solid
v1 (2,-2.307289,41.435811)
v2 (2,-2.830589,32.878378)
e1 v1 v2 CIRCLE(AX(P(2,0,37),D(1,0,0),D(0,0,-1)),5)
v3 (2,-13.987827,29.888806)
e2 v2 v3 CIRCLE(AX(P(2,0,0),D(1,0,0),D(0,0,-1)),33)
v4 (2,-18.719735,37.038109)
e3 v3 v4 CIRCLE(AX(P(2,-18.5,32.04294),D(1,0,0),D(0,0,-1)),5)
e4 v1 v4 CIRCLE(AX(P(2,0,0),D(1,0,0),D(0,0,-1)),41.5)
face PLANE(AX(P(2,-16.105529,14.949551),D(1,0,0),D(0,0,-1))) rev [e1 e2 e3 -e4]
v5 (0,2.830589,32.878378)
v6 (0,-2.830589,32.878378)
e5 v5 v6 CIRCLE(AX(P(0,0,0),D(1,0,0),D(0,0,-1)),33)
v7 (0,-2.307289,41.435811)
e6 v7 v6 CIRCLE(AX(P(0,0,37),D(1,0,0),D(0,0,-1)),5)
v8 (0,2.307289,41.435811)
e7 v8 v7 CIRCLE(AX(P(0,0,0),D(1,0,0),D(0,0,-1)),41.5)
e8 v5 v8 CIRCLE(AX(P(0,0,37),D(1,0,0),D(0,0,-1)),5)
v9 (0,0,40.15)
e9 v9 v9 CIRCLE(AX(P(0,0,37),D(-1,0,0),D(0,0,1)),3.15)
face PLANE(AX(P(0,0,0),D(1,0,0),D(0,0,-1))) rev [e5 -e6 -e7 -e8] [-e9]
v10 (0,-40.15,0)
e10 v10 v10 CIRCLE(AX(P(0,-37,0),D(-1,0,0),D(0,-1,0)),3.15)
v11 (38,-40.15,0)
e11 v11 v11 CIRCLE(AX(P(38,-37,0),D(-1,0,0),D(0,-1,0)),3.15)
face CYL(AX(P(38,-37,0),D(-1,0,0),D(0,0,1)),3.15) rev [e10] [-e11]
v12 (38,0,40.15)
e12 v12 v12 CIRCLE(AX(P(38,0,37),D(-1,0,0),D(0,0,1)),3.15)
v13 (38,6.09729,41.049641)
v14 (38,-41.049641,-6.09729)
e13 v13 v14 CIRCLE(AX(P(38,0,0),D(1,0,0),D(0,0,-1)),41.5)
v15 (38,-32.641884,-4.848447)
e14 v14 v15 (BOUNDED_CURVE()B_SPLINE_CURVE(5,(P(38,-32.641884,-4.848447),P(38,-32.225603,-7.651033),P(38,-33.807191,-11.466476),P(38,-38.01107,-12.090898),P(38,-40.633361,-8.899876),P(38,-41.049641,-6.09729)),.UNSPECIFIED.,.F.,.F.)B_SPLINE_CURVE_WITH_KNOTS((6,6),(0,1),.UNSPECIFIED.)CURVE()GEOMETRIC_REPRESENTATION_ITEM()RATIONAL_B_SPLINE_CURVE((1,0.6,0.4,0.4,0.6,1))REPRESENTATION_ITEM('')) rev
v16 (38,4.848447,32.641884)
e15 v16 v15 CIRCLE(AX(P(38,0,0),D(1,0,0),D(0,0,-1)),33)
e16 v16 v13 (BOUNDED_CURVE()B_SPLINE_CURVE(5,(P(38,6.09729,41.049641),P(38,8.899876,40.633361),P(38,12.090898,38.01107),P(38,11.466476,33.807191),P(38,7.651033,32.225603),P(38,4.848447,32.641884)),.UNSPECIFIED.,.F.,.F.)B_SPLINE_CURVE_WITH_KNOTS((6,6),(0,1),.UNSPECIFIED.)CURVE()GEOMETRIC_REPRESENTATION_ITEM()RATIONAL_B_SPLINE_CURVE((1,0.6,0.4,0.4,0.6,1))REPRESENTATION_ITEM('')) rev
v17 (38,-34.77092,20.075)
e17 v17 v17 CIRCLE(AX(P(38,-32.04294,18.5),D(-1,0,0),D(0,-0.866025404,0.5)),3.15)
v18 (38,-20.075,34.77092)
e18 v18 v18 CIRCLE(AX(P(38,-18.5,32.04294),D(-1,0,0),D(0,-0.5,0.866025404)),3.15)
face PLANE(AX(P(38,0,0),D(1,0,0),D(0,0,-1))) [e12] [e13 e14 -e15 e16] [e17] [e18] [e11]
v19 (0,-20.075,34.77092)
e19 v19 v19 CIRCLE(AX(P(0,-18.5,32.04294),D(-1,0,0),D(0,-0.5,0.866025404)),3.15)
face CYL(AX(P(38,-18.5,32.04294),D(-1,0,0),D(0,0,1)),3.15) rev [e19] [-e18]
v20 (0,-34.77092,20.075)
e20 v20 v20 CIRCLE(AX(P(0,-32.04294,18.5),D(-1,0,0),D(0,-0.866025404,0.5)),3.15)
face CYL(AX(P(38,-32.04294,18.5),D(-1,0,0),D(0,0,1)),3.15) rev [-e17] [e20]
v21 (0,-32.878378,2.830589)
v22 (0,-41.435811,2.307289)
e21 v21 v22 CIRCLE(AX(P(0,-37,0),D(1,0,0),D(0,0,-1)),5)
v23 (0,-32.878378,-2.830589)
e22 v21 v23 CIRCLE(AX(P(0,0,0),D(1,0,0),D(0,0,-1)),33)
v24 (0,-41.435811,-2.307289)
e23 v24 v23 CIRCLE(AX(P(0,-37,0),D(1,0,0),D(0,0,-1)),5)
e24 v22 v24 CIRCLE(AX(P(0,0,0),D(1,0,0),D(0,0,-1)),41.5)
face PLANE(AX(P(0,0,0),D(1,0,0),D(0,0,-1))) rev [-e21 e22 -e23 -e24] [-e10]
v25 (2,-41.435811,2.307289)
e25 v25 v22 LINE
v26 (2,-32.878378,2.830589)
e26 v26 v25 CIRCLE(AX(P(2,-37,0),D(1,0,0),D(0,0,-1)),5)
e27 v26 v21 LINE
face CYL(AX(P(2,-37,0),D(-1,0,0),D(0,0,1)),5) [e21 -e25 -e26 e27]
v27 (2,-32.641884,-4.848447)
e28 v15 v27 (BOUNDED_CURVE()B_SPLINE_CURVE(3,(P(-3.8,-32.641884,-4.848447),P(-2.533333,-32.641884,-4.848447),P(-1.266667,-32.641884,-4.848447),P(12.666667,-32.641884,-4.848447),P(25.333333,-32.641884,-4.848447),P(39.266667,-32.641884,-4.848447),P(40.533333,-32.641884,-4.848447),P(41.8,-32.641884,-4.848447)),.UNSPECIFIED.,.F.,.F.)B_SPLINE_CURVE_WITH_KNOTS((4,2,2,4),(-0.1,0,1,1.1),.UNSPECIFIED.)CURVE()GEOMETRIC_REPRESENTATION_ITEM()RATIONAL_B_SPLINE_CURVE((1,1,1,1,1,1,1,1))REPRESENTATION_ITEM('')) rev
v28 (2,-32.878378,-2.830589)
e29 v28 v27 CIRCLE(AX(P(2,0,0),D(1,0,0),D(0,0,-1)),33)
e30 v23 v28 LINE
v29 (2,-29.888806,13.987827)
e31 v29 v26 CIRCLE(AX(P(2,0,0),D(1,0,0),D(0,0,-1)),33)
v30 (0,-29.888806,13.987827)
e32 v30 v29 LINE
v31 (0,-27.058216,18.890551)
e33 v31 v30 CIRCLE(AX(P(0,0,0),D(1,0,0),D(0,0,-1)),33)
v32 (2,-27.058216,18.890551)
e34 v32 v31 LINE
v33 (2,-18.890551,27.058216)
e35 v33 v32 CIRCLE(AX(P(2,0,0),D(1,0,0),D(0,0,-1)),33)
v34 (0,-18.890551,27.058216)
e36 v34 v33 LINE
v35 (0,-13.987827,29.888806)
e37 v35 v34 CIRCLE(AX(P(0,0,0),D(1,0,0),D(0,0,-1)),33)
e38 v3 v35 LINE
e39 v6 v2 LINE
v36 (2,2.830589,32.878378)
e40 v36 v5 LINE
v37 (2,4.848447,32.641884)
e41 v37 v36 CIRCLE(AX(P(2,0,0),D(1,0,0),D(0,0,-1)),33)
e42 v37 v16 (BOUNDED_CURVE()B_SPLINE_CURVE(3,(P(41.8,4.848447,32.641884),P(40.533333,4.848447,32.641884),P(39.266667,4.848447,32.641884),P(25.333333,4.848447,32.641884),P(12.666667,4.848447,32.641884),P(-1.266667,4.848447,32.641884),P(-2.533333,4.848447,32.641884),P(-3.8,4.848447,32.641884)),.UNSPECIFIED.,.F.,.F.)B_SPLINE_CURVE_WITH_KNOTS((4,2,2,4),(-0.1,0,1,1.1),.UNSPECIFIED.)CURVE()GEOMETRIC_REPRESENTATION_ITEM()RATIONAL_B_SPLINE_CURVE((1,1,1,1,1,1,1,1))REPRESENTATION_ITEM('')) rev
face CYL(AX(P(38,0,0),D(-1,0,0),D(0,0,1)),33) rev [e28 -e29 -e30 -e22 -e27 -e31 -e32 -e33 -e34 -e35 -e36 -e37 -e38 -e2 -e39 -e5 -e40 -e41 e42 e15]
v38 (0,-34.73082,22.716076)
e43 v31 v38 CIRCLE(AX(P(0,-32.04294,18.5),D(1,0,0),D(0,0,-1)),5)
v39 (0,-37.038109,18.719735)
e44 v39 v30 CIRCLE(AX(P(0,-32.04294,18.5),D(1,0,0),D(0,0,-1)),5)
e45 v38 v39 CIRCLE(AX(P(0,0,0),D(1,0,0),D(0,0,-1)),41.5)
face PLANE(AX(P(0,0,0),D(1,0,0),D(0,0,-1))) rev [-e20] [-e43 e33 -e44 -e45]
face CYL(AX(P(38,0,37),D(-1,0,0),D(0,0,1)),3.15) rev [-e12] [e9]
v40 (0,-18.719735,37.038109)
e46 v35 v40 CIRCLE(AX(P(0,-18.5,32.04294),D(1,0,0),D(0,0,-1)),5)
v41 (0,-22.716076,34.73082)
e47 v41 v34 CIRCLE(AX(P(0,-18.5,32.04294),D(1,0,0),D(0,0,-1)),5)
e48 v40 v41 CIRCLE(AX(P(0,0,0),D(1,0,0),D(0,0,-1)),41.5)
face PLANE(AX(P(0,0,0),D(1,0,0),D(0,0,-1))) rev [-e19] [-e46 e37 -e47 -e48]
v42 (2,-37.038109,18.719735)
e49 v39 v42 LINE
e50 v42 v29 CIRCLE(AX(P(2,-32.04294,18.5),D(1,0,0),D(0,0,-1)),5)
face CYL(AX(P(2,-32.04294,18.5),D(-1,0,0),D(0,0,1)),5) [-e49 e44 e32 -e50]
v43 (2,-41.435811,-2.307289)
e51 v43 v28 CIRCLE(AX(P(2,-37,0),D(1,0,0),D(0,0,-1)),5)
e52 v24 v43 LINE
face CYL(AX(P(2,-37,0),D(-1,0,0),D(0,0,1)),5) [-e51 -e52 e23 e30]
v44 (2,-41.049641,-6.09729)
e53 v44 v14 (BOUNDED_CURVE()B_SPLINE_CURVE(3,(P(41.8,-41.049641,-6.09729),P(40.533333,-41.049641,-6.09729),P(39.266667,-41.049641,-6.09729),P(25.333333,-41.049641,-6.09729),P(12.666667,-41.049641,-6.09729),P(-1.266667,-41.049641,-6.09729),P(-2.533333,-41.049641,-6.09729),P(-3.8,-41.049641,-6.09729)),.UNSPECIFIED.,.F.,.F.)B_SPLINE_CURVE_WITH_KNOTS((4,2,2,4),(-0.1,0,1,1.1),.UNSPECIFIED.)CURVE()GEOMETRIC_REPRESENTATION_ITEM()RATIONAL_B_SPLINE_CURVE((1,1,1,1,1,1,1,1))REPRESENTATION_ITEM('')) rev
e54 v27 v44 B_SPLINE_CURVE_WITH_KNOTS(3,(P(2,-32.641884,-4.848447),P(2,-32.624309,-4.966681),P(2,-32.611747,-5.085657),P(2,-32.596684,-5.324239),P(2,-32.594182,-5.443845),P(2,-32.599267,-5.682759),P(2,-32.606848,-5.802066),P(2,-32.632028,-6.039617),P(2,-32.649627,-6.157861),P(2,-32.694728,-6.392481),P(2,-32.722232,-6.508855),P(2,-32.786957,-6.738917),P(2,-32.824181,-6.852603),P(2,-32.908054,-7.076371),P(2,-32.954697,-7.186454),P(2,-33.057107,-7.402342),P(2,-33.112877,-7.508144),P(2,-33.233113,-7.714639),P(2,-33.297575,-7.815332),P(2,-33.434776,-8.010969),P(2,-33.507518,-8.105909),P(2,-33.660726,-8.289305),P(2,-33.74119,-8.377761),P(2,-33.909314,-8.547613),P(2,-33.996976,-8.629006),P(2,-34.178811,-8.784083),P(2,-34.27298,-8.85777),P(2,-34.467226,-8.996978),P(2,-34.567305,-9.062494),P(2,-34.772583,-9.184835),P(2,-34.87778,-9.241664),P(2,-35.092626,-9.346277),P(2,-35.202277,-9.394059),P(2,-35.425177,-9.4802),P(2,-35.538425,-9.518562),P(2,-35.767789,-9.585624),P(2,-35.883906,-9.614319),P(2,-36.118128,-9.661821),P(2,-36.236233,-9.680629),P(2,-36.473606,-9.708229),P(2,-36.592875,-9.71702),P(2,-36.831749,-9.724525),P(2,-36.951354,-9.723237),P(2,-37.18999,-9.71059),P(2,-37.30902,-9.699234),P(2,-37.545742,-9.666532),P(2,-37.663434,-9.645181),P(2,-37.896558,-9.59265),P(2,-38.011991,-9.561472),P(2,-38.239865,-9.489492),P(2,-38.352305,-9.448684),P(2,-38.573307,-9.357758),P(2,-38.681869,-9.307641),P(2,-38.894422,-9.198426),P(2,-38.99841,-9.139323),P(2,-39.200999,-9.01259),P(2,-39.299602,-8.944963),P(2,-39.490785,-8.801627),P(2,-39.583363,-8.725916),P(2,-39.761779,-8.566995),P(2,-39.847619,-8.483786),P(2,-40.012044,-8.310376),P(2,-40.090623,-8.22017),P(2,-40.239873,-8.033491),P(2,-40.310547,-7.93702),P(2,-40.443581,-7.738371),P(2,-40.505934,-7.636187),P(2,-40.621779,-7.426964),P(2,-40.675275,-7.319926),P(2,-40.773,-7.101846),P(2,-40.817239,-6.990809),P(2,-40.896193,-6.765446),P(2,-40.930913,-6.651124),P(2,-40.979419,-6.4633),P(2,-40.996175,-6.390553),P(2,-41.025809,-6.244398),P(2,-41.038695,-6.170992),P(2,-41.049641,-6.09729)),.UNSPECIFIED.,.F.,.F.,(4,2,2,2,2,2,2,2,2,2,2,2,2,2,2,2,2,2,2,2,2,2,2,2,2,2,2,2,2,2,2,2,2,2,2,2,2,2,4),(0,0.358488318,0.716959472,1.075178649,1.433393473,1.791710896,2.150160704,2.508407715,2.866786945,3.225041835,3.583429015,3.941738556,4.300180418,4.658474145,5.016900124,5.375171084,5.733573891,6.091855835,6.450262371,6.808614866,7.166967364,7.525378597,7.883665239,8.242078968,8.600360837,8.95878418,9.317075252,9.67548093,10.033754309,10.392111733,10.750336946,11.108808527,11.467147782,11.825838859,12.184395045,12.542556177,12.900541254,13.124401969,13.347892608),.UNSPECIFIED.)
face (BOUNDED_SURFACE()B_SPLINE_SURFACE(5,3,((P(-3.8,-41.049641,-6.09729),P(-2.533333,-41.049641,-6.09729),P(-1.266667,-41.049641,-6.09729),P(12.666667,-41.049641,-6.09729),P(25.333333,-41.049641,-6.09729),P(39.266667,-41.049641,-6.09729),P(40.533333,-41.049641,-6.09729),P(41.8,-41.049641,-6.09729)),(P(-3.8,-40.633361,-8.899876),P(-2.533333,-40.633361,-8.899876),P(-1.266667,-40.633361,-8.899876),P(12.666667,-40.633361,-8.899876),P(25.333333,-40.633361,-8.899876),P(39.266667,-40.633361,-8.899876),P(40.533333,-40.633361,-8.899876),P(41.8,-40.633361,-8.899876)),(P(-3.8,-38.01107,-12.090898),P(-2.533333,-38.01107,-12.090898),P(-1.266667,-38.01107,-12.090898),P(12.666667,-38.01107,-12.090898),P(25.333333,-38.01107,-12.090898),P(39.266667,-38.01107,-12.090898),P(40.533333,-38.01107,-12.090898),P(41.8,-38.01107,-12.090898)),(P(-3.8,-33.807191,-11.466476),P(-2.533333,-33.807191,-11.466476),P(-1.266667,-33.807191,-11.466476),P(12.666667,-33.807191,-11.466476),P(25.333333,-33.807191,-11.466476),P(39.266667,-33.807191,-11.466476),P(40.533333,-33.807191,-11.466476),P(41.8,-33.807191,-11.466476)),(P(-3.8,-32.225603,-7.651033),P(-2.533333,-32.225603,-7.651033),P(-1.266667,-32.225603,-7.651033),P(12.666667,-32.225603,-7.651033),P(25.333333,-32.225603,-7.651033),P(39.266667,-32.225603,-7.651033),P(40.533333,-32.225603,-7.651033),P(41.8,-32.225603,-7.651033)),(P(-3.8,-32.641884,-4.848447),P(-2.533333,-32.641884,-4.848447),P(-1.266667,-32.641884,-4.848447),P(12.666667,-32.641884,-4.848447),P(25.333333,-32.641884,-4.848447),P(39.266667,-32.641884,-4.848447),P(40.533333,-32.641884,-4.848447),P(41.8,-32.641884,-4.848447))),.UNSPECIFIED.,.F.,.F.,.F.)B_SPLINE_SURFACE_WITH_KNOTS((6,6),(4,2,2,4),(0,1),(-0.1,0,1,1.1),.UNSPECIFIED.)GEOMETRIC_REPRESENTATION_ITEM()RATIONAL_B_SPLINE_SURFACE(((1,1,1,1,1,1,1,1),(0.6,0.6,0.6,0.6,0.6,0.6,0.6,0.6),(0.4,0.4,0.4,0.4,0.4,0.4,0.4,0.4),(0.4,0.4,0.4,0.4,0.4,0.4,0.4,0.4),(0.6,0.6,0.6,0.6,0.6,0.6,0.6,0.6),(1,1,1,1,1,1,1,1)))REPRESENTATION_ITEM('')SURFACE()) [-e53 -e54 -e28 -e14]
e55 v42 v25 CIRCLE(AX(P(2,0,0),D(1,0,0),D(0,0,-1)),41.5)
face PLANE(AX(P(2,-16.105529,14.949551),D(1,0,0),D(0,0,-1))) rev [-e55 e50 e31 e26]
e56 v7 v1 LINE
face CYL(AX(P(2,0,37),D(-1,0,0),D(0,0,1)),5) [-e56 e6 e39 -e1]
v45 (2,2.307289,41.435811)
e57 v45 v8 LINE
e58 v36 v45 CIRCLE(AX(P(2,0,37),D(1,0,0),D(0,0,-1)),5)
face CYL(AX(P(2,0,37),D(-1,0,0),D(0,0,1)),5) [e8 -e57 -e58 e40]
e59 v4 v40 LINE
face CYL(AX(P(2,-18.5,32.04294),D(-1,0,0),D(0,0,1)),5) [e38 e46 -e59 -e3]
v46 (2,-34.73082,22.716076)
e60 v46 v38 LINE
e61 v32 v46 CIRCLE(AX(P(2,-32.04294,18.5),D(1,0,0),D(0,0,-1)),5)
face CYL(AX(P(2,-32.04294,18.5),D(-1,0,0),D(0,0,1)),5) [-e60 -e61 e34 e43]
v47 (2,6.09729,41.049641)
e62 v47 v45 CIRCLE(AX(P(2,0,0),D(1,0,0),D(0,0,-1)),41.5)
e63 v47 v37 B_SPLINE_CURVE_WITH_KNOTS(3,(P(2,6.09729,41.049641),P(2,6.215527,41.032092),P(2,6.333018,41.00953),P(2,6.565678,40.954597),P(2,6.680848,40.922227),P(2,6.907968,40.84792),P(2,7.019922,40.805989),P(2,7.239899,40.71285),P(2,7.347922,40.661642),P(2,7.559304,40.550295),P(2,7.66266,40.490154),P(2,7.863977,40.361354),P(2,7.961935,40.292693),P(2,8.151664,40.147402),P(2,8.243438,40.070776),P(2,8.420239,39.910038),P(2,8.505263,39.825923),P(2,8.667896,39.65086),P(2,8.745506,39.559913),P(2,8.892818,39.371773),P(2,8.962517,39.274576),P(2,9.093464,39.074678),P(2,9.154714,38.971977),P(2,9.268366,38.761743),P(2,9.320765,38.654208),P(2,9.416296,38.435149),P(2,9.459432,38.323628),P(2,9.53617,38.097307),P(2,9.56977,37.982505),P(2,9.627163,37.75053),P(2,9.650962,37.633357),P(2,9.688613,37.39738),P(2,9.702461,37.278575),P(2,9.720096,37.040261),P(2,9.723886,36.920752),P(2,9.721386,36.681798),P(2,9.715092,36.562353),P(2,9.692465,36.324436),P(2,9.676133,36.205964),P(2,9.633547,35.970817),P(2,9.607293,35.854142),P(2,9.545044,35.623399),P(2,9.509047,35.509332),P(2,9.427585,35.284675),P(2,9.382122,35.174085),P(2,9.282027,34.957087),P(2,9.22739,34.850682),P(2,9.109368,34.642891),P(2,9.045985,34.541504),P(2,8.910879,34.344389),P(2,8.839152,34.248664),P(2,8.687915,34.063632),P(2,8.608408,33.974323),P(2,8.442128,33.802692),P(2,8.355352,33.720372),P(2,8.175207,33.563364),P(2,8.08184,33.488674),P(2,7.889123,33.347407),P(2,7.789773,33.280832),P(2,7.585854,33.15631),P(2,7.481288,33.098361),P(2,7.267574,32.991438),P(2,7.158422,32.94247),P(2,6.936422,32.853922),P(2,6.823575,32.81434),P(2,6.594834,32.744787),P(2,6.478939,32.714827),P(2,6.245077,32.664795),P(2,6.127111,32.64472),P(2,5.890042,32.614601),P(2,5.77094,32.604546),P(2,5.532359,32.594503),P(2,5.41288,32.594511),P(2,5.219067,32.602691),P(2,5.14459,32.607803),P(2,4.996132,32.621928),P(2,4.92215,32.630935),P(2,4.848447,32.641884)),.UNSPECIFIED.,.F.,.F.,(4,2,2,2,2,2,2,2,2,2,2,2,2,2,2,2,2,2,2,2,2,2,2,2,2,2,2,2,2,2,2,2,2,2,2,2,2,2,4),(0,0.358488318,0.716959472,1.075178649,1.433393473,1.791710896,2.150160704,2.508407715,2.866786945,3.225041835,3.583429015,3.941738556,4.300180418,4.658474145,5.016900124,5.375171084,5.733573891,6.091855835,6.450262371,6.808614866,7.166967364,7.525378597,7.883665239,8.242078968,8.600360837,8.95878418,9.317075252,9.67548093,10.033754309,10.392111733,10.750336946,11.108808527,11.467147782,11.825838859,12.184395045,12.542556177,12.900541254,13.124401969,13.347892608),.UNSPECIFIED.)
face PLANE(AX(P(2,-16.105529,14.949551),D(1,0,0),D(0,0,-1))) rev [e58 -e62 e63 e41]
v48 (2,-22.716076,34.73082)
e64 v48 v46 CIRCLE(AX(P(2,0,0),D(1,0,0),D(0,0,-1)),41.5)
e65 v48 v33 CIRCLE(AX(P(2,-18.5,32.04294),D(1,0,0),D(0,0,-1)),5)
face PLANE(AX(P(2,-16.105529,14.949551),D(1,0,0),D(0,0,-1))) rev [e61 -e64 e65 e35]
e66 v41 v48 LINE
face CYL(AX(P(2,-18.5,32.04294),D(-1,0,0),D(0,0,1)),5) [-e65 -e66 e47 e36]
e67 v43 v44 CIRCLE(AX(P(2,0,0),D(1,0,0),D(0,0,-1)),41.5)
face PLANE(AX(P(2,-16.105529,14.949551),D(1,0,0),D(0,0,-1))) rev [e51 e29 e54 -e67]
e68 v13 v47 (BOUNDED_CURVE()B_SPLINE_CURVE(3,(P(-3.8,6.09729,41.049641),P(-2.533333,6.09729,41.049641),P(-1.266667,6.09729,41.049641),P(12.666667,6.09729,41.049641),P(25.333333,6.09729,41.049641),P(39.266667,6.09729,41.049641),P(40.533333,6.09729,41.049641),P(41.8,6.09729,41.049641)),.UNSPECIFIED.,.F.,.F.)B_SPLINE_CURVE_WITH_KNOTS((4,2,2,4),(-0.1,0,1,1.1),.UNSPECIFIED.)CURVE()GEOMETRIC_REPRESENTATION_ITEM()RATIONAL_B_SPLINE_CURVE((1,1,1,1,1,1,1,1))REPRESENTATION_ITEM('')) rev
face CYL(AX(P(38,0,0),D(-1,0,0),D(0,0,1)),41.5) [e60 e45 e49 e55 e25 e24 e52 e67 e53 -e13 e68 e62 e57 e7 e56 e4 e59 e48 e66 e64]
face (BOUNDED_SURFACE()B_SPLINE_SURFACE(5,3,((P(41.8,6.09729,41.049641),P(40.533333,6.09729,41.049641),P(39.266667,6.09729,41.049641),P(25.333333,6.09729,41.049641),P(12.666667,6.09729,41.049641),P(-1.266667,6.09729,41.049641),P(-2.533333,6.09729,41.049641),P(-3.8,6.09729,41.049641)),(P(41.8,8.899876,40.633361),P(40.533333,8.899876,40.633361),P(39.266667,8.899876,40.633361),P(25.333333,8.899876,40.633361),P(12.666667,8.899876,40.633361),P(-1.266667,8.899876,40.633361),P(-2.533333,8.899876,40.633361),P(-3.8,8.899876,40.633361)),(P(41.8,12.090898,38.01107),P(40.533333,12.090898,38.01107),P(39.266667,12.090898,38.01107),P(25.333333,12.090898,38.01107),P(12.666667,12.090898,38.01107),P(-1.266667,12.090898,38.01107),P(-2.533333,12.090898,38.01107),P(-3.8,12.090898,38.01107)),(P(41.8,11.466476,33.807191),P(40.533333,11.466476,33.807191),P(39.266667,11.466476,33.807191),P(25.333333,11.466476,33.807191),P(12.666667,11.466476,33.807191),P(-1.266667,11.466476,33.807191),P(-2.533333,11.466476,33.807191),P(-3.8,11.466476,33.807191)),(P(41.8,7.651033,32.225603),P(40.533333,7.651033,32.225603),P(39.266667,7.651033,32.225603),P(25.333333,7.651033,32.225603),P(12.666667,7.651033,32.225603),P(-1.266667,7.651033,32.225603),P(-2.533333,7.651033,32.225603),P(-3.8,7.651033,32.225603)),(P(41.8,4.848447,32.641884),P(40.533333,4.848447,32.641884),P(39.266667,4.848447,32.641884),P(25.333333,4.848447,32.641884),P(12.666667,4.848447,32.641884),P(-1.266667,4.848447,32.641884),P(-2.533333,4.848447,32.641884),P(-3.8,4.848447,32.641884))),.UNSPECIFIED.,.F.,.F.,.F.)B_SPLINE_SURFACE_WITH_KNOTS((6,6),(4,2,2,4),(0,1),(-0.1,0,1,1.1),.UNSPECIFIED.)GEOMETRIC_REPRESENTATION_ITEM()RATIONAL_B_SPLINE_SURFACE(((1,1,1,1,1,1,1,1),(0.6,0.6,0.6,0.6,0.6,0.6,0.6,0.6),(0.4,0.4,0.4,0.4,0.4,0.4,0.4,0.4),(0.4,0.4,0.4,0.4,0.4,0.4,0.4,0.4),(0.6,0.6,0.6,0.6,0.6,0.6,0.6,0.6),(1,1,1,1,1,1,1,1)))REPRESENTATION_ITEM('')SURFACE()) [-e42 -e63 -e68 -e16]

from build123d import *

# Parameters (mm, degrees)
SKETCH_1_R               = 41.5
SKETCH_1_R_2             = 33
EXTRUDE_1_DEPTH          = 38
SKETCH_2_R               = 3.15
CUT_EXTRUDE_1_DEPTH      = 70.91780889
PATTERN_CIRCULAR_1_COUNT = 4
PATTERN_CIRCULAR_1_ANGLE = 90
CUT_EXTRUDE_2_DEPTH      = 38
FILLET_START             = -1
FILLET_1_DEPTH           = 40
FILLET_2_DEPTH           = 38
SKETCH_4_OUTSIDE_W       = 69.583
SKETCH_4_OUTSIDE_H       = 69.583
SKETCH_4_OUTSIDE_R       = 5
CUT_EXTRUDE_3_DEPTH      = 2


with BuildPart() as part:
    # 草图1 → 凸台-拉伸1 (new body)
    with BuildSketch(Plane(origin=(0, 0, 0), x_dir=(0, 0, -1), z_dir=(1, 0, 0))):
        Circle(SKETCH_1_R)
        Circle(SKETCH_1_R_2, mode=Mode.SUBTRACT)
    extrude(amount=EXTRUDE_1_DEPTH)

    # 草图2 → 切除-拉伸1 (cut, through all)
    with BuildSketch(Plane.ZY):
        with Locations((37, 0)):
            Circle(SKETCH_2_R)
    cut_extrude_1 = extrude(amount=-CUT_EXTRUDE_1_DEPTH, mode=Mode.SUBTRACT)

    # 阵列(圆周)1: 切除-拉伸1 ×4 about axis
    pattern_circular_1_axis = Axis((0, 0, 0), (1, 0, 0))
    for i in range(1, PATTERN_CIRCULAR_1_COUNT):
        add(cut_extrude_1.rotate(pattern_circular_1_axis, i * PATTERN_CIRCULAR_1_ANGLE / (PATTERN_CIRCULAR_1_COUNT - 1)), mode=Mode.SUBTRACT)

    # 草图3 → 切除-拉伸2 (cut)
    with BuildSketch(Plane.ZY):
        with BuildLine():
            Line((40.085921791, 10.740990372), (0, 0))
            Line((0, 0), (-10.740990372, -40.085921791))
            ThreePointArc((-10.740990372, -40.085921791), (-29.344931419, 29.344931419), (40.085921791, 10.740990372))
        make_face()
    extrude(amount=-CUT_EXTRUDE_2_DEPTH, mode=Mode.SUBTRACT)

    # 圆角1: read off the stored shape, not the designer's step
    # 圆角1 outline → 圆角1 (cut)
    with BuildSketch(Plane.YZ.offset(FILLET_START)):
        with BuildLine():
            ThreePointArc((10.740990372, 40.085921791), (8.43291814, 40.634171477), (6.097289766, 41.049641381))
            add(Edge.make_bspline(
                [(6.097289766, 41.049641381), (7.224539758, 40.882205817), (8.479546293, 40.316443685), (9.579562271, 39.181662294), (10.053171447, 37.518946615), (9.578053286, 35.745781503)],
                knots=[0, 0, 0, 0, 0, 0, 0.528616925, 0.528616925, 0.528616925, 0.528616925, 0.528616925, 0.528616925], degree=5, weights=[1, 0.78855323, 0.632993631, 0.533321202, 0.489535944, 0.501637857]))
            Line((9.578053286, 35.745781503), (10.740990372, 40.085921791))
        make_face()
        with BuildLine():
            Line((8.541028488, 31.875552268), (9.578053286, 35.745781503))
            add(Edge.make_bspline(
                [(9.578053286, 35.745781503), (9.173304992, 34.235240304), (8.196828695, 33.153640695), (6.985664176, 32.610562324), (5.825288873, 32.496788788), (4.848447284, 32.641883508)],
                knots=[0.528616925, 0.528616925, 0.528616925, 0.528616925, 0.528616925, 0.528616925, 1, 1, 1, 1, 1, 1], degree=5, weights=[0.501637857, 0.512429484, 0.567661512, 0.667333941, 0.81144677, 1]))
            ThreePointArc((4.848447284, 32.641883508), (6.705693943, 32.31150985), (8.541028488, 31.875552268))
        make_face()
    extrude(amount=FILLET_1_DEPTH, mode=Mode.SUBTRACT)

    # 圆角2: read off the stored shape, not the designer's step
    # 圆角2 outline → 圆角2 (cut)
    with BuildSketch(Plane.YZ):
        with BuildLine():
            add(Edge.make_bspline(
                [(-41.049641381, -6.097289766), (-40.882205817, -7.224539758), (-40.316443685, -8.479546293), (-39.181662294, -9.579562271), (-37.518946615, -10.053171446), (-35.745781503, -9.578053286)],
                knots=[0, 0, 0, 0, 0, 0, 0.528616925, 0.528616925, 0.528616925, 0.528616925, 0.528616925, 0.528616925], degree=5, weights=[1, 0.78855323, 0.632993631, 0.533321202, 0.489535944, 0.501637857]))
            ThreePointArc((-41.049641381, -6.097289766), (-40.634171477, -8.43291814), (-40.085921791, -10.740990372))
            Line((-40.085921791, -10.740990372), (-35.745781503, -9.578053286))
        make_face()
        with BuildLine():
            add(Edge.make_bspline(
                [(-35.745781503, -9.578053286), (-34.235240304, -9.173304992), (-33.153640695, -8.196828695), (-32.610562324, -6.985664176), (-32.496788788, -5.825288873), (-32.641883508, -4.848447284)],
                knots=[0.528616925, 0.528616925, 0.528616925, 0.528616925, 0.528616925, 0.528616925, 1, 1, 1, 1, 1, 1], degree=5, weights=[0.501637857, 0.512429484, 0.567661512, 0.667333941, 0.81144677, 1]))
            Line((-35.745781503, -9.578053286), (-31.875552268, -8.541028488))
            ThreePointArc((-31.875552268, -8.541028488), (-32.31150985, -6.705693943), (-32.641883508, -4.848447284))
        make_face()
    extrude(amount=FILLET_2_DEPTH, mode=Mode.SUBTRACT)

    # 草图4 outside → 切除-拉伸3 (cut)
    with BuildSketch(Plane(origin=(0, 0, 0), x_dir=(0, 0, -1), z_dir=(1, 0, 0))):
        with Locations((-15.8885, -15.8885)):
            Rectangle(SKETCH_4_OUTSIDE_W, SKETCH_4_OUTSIDE_H)
        with Locations((-18.5, -32.04293994)):
            Circle(SKETCH_4_OUTSIDE_R, mode=Mode.SUBTRACT)
        with Locations((-37, 0)):
            Circle(SKETCH_4_OUTSIDE_R, mode=Mode.SUBTRACT)
        with Locations((0, -37)):
            Circle(SKETCH_4_OUTSIDE_R, mode=Mode.SUBTRACT)
        with Locations((-32.04293994, -18.5)):
            Circle(SKETCH_4_OUTSIDE_R, mode=Mode.SUBTRACT)
    extrude(amount=CUT_EXTRUDE_3_DEPTH, mode=Mode.SUBTRACT)


solid = part.part
